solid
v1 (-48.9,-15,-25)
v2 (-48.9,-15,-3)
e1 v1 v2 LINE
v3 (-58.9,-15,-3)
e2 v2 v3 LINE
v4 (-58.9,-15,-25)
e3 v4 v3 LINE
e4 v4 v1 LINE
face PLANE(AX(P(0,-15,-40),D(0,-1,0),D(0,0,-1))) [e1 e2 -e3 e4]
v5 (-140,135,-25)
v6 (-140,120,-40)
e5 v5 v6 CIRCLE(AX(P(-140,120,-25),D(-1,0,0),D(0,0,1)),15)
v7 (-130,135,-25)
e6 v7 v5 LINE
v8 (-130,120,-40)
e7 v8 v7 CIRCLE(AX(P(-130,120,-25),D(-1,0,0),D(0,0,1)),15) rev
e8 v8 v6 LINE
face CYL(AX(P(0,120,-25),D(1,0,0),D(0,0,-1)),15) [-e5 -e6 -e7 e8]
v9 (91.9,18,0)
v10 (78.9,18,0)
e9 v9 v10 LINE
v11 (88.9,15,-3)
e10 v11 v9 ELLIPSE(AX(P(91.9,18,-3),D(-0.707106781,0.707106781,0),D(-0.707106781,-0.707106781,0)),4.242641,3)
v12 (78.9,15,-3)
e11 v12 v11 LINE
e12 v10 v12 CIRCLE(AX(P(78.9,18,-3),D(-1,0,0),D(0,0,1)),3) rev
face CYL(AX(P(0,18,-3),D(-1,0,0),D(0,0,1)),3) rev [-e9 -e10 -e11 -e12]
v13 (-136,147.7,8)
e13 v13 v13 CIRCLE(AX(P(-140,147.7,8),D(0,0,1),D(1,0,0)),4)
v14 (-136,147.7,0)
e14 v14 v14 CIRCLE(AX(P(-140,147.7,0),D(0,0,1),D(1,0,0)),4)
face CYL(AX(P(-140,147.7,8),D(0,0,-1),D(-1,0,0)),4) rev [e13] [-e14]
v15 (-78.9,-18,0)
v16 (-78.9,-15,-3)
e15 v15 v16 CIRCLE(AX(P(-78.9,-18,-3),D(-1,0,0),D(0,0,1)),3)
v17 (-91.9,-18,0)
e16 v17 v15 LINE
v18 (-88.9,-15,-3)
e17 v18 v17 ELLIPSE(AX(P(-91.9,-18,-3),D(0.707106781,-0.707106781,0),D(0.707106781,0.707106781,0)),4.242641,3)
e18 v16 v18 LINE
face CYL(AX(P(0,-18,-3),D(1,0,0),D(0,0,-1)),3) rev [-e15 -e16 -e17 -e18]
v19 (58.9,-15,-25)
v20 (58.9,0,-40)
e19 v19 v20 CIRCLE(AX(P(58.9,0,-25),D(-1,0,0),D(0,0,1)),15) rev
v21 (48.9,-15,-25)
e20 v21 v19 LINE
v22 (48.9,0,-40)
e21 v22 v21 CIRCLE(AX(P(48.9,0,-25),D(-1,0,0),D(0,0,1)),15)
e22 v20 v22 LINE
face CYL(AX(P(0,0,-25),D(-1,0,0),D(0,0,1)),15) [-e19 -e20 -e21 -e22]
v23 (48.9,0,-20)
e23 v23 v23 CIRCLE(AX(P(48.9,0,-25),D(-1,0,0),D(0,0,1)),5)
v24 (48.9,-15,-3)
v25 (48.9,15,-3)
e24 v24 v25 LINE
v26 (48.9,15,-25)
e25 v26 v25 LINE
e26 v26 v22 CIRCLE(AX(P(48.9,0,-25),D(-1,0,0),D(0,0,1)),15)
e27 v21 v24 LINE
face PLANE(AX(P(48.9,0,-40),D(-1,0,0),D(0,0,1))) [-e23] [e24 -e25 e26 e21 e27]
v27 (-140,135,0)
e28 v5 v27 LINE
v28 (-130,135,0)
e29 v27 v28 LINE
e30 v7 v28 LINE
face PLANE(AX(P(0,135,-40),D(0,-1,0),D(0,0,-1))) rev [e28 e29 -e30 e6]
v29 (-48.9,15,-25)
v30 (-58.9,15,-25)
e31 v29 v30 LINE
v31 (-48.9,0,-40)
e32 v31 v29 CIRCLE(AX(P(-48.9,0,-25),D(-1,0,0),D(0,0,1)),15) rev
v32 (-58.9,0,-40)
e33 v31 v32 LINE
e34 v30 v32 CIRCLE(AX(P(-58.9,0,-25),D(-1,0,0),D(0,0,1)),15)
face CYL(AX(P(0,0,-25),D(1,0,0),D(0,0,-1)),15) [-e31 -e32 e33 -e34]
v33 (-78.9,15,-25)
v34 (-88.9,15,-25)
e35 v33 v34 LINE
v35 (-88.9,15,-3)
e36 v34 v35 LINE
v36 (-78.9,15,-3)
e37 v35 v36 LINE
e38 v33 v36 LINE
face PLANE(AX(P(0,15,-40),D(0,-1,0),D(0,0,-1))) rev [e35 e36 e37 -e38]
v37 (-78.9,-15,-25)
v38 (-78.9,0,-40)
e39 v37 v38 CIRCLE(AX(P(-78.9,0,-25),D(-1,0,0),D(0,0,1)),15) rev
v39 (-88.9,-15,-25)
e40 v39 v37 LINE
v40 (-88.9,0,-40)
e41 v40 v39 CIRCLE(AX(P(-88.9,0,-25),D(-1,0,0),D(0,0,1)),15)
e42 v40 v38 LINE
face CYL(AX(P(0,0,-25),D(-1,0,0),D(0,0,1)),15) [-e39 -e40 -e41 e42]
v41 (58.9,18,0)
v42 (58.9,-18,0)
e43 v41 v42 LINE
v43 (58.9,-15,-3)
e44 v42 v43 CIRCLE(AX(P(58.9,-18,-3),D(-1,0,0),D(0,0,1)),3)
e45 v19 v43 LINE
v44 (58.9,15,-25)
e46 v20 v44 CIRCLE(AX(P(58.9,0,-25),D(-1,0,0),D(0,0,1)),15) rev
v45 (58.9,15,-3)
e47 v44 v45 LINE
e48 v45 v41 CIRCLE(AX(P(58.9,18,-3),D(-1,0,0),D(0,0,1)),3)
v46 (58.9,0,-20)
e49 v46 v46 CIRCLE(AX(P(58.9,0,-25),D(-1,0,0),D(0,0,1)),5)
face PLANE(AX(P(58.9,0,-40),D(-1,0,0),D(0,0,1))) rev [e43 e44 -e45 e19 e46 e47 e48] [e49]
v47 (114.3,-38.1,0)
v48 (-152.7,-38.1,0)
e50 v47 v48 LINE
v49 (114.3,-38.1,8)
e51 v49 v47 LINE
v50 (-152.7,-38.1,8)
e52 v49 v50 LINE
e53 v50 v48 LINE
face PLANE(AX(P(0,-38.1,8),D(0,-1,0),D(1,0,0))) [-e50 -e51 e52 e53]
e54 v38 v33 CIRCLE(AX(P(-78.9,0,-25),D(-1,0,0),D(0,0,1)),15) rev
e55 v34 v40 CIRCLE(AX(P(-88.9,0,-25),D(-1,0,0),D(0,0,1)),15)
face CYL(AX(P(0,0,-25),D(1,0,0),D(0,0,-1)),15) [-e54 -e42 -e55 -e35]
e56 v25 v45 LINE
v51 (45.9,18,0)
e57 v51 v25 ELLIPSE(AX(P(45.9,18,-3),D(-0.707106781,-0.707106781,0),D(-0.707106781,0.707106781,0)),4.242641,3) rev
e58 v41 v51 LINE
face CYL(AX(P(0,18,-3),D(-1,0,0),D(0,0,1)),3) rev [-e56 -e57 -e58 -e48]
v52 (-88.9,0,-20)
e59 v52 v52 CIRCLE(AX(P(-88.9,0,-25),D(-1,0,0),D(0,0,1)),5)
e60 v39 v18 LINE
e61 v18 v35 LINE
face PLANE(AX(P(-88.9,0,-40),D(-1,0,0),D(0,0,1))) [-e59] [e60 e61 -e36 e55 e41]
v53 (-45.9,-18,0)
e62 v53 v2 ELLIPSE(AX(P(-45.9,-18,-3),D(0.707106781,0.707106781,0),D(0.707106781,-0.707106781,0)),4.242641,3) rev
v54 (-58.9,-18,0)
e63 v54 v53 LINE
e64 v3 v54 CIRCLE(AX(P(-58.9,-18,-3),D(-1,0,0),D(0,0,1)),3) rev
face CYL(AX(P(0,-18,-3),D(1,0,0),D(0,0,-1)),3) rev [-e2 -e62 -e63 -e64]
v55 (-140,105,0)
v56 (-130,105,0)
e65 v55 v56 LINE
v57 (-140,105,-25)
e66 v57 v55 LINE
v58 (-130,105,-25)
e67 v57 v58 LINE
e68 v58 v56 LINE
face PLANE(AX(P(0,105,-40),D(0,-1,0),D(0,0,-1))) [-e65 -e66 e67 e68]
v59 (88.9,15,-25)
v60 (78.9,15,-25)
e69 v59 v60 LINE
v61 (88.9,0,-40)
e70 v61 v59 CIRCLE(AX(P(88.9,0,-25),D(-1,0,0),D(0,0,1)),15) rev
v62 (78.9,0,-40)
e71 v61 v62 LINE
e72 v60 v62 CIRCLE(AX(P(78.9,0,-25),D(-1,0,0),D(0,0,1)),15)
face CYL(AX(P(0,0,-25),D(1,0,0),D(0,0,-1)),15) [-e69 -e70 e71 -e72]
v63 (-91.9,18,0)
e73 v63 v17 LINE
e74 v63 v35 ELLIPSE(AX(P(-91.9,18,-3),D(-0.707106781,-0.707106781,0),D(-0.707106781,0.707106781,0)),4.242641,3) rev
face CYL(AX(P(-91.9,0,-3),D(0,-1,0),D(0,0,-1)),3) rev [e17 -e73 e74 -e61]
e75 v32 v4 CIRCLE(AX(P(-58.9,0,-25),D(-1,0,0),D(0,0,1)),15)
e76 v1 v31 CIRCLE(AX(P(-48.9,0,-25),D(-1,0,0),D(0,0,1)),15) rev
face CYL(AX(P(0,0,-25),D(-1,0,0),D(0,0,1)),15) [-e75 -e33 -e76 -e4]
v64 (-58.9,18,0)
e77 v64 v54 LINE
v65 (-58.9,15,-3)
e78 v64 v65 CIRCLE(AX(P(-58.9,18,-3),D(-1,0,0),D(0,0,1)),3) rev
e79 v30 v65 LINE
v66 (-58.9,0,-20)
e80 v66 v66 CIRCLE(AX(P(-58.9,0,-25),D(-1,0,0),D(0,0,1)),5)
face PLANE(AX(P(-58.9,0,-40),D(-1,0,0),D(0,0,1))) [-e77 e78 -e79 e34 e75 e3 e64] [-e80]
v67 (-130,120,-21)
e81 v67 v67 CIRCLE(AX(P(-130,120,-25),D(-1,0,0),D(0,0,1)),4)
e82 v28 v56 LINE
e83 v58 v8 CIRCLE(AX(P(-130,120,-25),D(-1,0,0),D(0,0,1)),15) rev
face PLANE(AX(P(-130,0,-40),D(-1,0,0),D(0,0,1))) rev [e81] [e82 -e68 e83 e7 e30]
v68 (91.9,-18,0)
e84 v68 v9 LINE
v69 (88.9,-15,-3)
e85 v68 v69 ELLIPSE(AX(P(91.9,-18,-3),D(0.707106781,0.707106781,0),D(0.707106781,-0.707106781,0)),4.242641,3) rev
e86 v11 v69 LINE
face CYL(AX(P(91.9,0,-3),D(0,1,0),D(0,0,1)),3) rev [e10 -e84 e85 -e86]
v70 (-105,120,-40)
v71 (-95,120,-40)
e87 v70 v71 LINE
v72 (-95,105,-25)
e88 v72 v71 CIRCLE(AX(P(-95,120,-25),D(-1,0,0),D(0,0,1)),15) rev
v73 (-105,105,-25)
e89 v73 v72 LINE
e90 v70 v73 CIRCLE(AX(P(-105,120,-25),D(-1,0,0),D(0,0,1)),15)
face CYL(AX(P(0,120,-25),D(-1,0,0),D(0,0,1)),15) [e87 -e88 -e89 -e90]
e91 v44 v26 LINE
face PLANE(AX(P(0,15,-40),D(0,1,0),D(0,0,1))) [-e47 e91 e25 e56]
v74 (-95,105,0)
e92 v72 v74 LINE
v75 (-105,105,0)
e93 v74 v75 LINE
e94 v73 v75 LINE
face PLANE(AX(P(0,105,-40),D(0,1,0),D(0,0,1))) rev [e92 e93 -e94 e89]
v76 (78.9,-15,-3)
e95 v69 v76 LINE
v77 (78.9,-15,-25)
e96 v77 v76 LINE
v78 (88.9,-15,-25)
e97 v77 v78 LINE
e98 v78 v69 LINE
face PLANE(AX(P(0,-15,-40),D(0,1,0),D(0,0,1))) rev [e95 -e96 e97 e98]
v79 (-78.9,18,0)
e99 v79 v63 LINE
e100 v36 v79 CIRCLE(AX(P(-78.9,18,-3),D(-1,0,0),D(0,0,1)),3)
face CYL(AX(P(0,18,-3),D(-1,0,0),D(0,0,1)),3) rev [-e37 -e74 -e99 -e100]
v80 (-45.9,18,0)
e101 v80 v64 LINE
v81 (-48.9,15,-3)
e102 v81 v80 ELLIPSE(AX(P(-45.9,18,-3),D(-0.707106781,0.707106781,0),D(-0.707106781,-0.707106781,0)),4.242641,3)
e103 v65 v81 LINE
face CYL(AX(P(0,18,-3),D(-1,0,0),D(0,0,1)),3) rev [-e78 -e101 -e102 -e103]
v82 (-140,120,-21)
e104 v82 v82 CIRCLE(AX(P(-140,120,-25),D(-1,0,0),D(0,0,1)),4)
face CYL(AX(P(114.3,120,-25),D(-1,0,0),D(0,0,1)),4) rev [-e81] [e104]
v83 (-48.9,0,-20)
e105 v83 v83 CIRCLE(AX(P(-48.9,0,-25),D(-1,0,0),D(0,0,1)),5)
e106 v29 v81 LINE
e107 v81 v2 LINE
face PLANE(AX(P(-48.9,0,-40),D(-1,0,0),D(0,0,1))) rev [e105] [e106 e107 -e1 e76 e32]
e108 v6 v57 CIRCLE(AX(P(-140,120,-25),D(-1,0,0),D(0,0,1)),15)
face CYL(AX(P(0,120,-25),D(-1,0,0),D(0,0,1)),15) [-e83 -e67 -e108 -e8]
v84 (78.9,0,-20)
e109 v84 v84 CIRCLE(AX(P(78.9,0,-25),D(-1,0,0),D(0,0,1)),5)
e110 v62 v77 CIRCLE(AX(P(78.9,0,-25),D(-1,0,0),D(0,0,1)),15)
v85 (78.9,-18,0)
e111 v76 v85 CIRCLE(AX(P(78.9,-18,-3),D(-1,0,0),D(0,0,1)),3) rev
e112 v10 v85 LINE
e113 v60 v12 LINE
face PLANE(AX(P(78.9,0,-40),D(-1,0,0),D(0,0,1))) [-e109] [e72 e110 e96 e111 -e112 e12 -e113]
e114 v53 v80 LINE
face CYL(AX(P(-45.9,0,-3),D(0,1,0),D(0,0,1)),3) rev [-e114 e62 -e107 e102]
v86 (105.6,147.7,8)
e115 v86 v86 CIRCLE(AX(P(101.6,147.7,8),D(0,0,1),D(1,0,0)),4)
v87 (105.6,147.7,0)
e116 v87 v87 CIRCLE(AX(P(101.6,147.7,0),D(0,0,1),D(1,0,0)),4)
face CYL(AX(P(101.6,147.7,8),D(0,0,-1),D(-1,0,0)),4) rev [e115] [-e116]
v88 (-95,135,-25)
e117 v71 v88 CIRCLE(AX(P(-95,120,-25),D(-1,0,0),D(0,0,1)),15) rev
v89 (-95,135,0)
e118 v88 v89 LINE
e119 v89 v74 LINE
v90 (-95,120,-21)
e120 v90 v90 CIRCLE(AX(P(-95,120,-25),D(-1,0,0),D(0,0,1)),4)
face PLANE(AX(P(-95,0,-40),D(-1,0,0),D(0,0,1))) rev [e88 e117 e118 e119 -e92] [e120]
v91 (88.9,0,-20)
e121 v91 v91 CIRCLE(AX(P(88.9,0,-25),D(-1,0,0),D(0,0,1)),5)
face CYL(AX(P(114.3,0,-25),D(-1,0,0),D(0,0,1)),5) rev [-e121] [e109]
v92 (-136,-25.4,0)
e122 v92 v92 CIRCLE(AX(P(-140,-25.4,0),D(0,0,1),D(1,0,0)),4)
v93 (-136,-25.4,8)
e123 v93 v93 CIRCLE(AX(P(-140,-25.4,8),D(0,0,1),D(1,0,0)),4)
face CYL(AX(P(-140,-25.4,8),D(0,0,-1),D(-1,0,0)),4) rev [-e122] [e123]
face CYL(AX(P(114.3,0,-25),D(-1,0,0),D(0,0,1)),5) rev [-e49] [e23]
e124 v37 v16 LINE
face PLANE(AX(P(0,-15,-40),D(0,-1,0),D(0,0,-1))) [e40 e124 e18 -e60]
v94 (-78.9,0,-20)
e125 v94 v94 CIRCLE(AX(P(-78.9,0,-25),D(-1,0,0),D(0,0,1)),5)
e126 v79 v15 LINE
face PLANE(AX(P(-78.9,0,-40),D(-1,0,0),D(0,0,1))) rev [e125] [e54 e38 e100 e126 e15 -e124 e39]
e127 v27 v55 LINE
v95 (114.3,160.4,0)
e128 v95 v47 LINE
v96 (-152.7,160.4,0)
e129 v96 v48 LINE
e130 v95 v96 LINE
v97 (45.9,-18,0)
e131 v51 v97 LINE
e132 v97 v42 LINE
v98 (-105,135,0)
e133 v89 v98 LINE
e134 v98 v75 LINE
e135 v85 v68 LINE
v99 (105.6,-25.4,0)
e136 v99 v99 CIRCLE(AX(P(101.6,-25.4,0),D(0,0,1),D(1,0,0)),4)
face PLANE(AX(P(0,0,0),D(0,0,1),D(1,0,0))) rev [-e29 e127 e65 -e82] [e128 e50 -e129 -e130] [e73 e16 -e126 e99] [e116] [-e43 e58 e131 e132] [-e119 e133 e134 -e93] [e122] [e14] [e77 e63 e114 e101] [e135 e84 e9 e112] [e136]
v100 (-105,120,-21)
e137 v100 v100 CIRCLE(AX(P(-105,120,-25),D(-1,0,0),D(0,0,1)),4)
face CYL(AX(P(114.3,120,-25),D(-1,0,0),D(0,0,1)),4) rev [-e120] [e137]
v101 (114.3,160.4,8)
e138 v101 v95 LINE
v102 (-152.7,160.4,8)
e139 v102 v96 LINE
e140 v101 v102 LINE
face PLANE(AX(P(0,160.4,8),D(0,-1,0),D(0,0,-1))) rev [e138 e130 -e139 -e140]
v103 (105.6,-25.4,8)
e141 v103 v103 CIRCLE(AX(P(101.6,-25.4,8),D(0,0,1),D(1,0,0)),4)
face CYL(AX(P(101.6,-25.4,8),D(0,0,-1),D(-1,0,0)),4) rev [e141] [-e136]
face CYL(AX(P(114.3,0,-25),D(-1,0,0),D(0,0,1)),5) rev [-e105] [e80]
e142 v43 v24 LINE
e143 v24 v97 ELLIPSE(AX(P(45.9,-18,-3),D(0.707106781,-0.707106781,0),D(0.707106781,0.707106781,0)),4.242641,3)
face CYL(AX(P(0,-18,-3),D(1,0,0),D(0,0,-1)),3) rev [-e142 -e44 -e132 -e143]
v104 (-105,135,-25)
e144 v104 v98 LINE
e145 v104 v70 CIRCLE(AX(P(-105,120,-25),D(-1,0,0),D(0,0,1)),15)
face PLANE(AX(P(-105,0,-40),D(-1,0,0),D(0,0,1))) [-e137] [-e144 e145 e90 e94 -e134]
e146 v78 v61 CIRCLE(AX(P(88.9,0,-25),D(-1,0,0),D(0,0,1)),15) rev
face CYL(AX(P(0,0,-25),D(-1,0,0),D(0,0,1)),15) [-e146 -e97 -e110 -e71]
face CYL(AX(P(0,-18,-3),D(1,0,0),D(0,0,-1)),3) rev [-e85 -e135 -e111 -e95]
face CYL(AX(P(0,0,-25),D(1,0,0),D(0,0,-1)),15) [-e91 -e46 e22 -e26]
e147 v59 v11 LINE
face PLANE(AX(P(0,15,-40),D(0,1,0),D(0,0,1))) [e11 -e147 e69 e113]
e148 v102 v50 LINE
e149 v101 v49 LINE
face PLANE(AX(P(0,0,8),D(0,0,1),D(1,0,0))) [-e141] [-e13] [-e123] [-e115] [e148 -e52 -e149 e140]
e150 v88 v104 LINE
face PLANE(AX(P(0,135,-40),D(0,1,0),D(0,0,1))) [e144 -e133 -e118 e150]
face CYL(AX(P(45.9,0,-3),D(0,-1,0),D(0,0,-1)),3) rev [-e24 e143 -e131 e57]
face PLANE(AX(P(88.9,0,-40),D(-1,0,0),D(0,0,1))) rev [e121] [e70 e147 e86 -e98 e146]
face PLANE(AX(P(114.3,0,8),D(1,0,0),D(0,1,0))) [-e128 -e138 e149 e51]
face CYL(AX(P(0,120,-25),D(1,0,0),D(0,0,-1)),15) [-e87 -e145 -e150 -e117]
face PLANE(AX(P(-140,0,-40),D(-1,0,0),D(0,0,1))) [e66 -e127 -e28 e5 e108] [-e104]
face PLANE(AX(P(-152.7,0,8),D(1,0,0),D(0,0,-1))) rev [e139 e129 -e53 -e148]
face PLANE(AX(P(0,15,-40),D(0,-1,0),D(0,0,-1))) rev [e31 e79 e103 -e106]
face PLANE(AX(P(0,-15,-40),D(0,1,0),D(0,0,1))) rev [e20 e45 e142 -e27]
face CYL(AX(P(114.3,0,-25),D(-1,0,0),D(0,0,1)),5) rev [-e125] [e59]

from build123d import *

# Parameters (mm, degrees)
SKETCH1_R               = 4
SKETCH1_W               = 10
SKETCH1_H               = 30
BOSS_EXTRUDE1_DEPTH     = 8
SKETCH1_3_W             = 10
SKETCH1_3_H             = 30
BOSS_EXTRUDE2_DEPTH     = 40
FILLET1_R               = 3
CUT_EXTRUDE1_DEPTH      = 262.951140482
CUT_EXTRUDE1_DEPTH_BACK = 262.951140482
SKETCH2_R               = 5
SKETCH2_R_2             = 4
FILLET2_R               = 15
FILLET3_R               = 15


with BuildPart() as part:
    # Sketch1 → Boss-Extrude1 (new body)
    # profile 1 of 7: a face of its own
    with BuildSketch(Plane.XY):
        Polygon((-152.7, -38.1), (-114.3, -38.1), (114.3, -38.1), (114.3, 38.1), (114.3, 160.4), (-114.3, 160.4), (-152.7, 160.4), align=None)
        with Locations((-140, -25.4)):
            Circle(SKETCH1_R, mode=Mode.SUBTRACT)
        with Locations((-83.9, 0)):
            Rectangle(SKETCH1_W, SKETCH1_H, mode=Mode.SUBTRACT)
        with Locations((-53.9, 0)):
            Rectangle(SKETCH1_W, SKETCH1_H, mode=Mode.SUBTRACT)
        with Locations((101.6, -25.4)):
            Circle(SKETCH1_R, mode=Mode.SUBTRACT)
        with Locations((53.9, 0)):
            Rectangle(SKETCH1_W, SKETCH1_H, mode=Mode.SUBTRACT)
        with Locations((83.9, 0)):
            Rectangle(SKETCH1_W, SKETCH1_H, mode=Mode.SUBTRACT)
        with Locations((-135, 120)):
            Rectangle(SKETCH1_W, SKETCH1_H, mode=Mode.SUBTRACT)
        with Locations((-100, 120)):
            Rectangle(SKETCH1_W, SKETCH1_H, mode=Mode.SUBTRACT)
        with Locations((-140, 147.7)):
            Circle(SKETCH1_R, mode=Mode.SUBTRACT)
        with Locations((101.6, 147.7)):
            Circle(SKETCH1_R, mode=Mode.SUBTRACT)
    # profile 2 of 7: a face of its own
    with BuildSketch(Plane.XY):
        with Locations((-53.9, 0)):
            Rectangle(SKETCH1_W, SKETCH1_H)
    # profile 3 of 7: a face of its own
    with BuildSketch(Plane.XY):
        with Locations((-83.9, 0)):
            Rectangle(SKETCH1_W, SKETCH1_H)
    # profile 4 of 7: a face of its own
    with BuildSketch(Plane.XY):
        with Locations((53.9, 0)):
            Rectangle(SKETCH1_W, SKETCH1_H)
    # profile 5 of 7: a face of its own
    with BuildSketch(Plane.XY):
        with Locations((83.9, 0)):
            Rectangle(SKETCH1_W, SKETCH1_H)
    # profile 6 of 7: a face of its own
    with BuildSketch(Plane.XY):
        with Locations((-100, 120)):
            Rectangle(SKETCH1_W, SKETCH1_H)
    # profile 7 of 7: a face of its own
    with BuildSketch(Plane.XY):
        with Locations((-135, 120)):
            Rectangle(SKETCH1_W, SKETCH1_H)
    extrude(amount=BOSS_EXTRUDE1_DEPTH)

    # Sketch1<3> → Boss-Extrude2 (add)
    with BuildSketch(Plane.XY):
        with Locations((-83.9, 0)):
            Rectangle(SKETCH1_3_W, SKETCH1_3_H)
        with Locations((-53.9, 0)):
            Rectangle(SKETCH1_3_W, SKETCH1_3_H)
        with Locations((83.9, 0)):
            Rectangle(SKETCH1_3_W, SKETCH1_3_H)
        with Locations((53.9, 0)):
            Rectangle(SKETCH1_3_W, SKETCH1_3_H)
        with Locations((-100, 120)):
            Rectangle(SKETCH1_3_W, SKETCH1_3_H)
        with Locations((-135, 120)):
            Rectangle(SKETCH1_3_W, SKETCH1_3_H)
    extrude(amount=-BOSS_EXTRUDE2_DEPTH)

    # Fillet1
    fillet1_edges = [part.edges().sort_by_distance(p)[0] for p in [
        (-83.9, 15, 0),
        (-88.9, 0, 0),
        (-83.9, -15, 0),
        (-48.9, 0, 0),
        (-53.9, 15, 0),
        (-53.9, -15, 0),
        (88.9, 0, 0),
        (83.9, -15, 0),
        (83.9, 15, 0),
        (53.9, -15, 0),
        (53.9, 15, 0),
        (48.9, 0, 0),
    ]]
    fillet(fillet1_edges, radius=FILLET1_R)

    # Sketch2 → Cut-Extrude1 (cut, two sides: drawn at the far end of the back side and taken through both)
    with BuildSketch(Plane.ZY.offset(88.9).offset(-CUT_EXTRUDE1_DEPTH_BACK)):
        with Locations((-25, 0)):
            Circle(SKETCH2_R)
        with Locations((-25, 120)):
            Circle(SKETCH2_R_2)
    extrude(amount=CUT_EXTRUDE1_DEPTH + CUT_EXTRUDE1_DEPTH_BACK, mode=Mode.SUBTRACT)

    # Fillet2
    fillet2_edges = [part.edges().sort_by_distance(p)[0] for p in [
        (53.9, 15, -40),
        (53.9, -15, -40),
        (83.9, 15, -40),
        (83.9, -15, -40),
        (-53.9, 15, -40),
        (-53.9, -15, -40),
        (-83.9, -15, -40),
        (-83.9, 15, -40),
    ]]
    fillet(fillet2_edges, radius=FILLET2_R - 0.0001)  # a hair under: the kernel refuses the full size

    # Fillet3
    fillet3_edges = [part.edges().sort_by_distance(p)[0] for p in [
        (-135, 135, -40),
        (-135, 105, -40),
        (-100, 105, -40),
        (-100, 135, -40),
    ]]
    fillet(fillet3_edges, radius=FILLET3_R - 0.0001)  # a hair under: the kernel refuses the full size


solid = part.part
